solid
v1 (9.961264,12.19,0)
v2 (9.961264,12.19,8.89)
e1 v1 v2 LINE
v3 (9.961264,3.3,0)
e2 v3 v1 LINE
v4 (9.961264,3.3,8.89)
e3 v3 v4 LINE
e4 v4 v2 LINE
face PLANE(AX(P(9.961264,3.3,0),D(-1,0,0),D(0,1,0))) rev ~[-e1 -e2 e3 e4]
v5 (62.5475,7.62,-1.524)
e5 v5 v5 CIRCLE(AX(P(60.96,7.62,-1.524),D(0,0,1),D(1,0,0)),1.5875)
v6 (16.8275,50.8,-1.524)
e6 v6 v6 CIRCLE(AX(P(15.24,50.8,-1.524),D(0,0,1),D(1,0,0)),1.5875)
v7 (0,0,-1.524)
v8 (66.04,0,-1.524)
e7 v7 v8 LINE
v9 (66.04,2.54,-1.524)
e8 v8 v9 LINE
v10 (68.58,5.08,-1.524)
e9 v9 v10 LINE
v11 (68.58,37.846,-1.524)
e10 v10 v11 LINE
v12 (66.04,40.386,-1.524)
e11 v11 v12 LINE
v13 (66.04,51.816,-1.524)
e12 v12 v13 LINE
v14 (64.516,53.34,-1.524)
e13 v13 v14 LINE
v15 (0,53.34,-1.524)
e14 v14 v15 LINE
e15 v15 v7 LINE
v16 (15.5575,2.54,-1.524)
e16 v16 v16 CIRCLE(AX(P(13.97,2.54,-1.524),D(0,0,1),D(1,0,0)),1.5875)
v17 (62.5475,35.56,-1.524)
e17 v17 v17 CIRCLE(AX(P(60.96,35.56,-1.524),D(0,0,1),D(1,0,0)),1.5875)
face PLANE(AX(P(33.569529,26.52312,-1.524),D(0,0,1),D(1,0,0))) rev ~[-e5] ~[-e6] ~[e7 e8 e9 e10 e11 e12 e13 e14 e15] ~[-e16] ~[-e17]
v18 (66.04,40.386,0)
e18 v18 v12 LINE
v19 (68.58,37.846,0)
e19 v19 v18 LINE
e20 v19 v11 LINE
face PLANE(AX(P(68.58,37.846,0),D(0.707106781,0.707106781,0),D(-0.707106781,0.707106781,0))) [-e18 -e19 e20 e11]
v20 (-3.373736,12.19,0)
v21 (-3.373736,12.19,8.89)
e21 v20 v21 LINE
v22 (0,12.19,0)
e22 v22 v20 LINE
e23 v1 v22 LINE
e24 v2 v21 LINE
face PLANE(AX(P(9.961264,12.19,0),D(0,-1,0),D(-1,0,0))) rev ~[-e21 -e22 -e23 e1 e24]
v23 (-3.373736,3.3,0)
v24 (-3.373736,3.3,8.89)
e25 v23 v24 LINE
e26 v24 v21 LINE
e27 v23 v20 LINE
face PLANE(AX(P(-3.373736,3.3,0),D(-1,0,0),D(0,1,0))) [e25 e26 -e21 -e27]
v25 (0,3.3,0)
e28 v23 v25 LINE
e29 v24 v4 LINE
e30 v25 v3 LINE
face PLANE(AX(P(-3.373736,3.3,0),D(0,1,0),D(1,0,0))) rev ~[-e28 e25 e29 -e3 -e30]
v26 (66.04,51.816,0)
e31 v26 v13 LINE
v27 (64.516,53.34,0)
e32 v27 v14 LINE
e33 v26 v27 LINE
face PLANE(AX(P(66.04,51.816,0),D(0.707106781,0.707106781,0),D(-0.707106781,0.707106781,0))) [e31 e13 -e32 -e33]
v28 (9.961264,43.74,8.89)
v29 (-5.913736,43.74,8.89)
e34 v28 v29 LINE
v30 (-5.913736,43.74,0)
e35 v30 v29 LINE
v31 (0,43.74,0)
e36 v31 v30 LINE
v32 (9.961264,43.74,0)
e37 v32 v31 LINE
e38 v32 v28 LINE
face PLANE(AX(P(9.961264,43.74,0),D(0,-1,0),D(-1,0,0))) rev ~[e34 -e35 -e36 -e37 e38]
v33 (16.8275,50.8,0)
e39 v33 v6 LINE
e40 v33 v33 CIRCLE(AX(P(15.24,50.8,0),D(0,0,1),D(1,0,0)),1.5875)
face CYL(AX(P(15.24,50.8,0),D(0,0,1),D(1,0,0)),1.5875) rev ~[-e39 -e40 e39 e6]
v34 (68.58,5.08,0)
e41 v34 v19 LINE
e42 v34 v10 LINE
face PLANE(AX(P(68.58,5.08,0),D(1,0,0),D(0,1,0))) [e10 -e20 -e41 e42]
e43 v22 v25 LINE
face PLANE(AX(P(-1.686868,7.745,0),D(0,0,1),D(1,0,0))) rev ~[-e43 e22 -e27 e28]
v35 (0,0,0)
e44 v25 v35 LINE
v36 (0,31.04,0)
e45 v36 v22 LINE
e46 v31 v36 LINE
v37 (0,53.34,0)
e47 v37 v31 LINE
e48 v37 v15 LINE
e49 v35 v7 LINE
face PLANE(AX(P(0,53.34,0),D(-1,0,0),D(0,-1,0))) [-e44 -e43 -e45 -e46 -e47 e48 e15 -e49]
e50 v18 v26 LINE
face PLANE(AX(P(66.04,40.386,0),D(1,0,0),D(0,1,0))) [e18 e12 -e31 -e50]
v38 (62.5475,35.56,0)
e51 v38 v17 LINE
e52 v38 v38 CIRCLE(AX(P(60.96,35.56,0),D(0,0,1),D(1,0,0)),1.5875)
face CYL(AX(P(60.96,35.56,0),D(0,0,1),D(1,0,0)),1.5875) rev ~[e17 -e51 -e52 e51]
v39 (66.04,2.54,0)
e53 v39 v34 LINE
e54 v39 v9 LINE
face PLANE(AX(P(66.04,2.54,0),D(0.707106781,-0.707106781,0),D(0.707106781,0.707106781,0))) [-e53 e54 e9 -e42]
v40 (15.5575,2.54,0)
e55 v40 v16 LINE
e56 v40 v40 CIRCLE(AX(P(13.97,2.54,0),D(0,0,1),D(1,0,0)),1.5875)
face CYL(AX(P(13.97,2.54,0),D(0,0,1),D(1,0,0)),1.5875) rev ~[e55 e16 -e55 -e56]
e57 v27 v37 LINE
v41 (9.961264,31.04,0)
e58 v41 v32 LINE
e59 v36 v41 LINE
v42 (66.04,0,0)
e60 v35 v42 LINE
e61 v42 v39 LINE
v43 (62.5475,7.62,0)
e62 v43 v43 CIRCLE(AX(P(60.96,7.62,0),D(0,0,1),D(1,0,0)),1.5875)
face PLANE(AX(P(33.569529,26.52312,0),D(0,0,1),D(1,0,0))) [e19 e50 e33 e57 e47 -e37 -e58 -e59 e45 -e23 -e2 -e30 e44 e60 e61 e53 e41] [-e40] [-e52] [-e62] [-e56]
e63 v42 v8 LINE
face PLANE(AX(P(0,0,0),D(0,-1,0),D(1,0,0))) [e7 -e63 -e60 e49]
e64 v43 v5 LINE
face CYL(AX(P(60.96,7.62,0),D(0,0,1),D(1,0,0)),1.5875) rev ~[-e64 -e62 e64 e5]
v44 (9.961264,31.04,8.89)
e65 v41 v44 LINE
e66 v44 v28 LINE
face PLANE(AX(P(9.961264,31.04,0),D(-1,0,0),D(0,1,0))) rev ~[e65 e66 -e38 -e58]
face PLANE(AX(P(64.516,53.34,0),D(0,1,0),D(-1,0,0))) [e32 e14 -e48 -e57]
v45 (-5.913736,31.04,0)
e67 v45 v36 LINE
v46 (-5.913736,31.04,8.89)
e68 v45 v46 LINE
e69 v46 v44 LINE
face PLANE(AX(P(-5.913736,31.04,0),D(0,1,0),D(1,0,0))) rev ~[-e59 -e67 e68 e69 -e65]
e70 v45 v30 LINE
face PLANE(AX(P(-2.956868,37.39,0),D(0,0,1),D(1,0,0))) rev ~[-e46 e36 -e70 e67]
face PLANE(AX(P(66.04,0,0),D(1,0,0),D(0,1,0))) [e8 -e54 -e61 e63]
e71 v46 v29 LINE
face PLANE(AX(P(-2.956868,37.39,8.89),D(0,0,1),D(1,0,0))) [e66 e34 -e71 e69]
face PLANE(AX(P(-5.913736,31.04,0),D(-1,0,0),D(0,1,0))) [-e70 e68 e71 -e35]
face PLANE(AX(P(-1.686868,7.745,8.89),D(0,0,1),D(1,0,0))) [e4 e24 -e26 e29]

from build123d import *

# Parameters (mm, degrees)
F0_R     = 1.5875
F1_DEPTH = 1.524
F2_W     = 5.913735792
F2_H     = 12.7
F2_W_2   = 9.961264208
F2_W_3   = 3.373735792
F2_H_2   = 8.89
F3_DEPTH = 8.89


# Not quite as in the source:
# - a feature names something its author has since deleted; it is built from what else it names


with BuildPart() as f1:
    # F0 (on Top) → F1 (new body)
    with BuildSketch(Plane.XY):
        Polygon((0, 53.34), (0, 0), (66.04, 0), (66.04, 2.54), (68.58, 5.08), (68.58, 37.846), (66.04, 40.386), (66.04, 51.816), (64.516, 53.34), align=None)
        with Locations((13.97, 2.54)):
            Circle(F0_R, mode=Mode.SUBTRACT)
        with Locations((60.96, 7.62)):
            Circle(F0_R, mode=Mode.SUBTRACT)
        with Locations((15.24, 50.8)):
            Circle(F0_R, mode=Mode.SUBTRACT)
        with Locations((60.96, 35.56)):
            Circle(F0_R, mode=Mode.SUBTRACT)
    extrude(amount=-F1_DEPTH)

    # F2 (on face) → F3 (join)
    with BuildSketch(Plane.XY):
        with Locations((-2.956867896, 37.39)):
            Rectangle(F2_W, F2_H)
        with Locations((4.980632104, 37.39)):
            Rectangle(F2_W_2, F2_H)
        with Locations((-1.686867896, 7.745)):
            Rectangle(F2_W_3, F2_H_2)
        with Locations((4.980632104, 7.745)):
            Rectangle(F2_W_2, F2_H_2)
    extrude(amount=F3_DEPTH)


solid = f1.part
